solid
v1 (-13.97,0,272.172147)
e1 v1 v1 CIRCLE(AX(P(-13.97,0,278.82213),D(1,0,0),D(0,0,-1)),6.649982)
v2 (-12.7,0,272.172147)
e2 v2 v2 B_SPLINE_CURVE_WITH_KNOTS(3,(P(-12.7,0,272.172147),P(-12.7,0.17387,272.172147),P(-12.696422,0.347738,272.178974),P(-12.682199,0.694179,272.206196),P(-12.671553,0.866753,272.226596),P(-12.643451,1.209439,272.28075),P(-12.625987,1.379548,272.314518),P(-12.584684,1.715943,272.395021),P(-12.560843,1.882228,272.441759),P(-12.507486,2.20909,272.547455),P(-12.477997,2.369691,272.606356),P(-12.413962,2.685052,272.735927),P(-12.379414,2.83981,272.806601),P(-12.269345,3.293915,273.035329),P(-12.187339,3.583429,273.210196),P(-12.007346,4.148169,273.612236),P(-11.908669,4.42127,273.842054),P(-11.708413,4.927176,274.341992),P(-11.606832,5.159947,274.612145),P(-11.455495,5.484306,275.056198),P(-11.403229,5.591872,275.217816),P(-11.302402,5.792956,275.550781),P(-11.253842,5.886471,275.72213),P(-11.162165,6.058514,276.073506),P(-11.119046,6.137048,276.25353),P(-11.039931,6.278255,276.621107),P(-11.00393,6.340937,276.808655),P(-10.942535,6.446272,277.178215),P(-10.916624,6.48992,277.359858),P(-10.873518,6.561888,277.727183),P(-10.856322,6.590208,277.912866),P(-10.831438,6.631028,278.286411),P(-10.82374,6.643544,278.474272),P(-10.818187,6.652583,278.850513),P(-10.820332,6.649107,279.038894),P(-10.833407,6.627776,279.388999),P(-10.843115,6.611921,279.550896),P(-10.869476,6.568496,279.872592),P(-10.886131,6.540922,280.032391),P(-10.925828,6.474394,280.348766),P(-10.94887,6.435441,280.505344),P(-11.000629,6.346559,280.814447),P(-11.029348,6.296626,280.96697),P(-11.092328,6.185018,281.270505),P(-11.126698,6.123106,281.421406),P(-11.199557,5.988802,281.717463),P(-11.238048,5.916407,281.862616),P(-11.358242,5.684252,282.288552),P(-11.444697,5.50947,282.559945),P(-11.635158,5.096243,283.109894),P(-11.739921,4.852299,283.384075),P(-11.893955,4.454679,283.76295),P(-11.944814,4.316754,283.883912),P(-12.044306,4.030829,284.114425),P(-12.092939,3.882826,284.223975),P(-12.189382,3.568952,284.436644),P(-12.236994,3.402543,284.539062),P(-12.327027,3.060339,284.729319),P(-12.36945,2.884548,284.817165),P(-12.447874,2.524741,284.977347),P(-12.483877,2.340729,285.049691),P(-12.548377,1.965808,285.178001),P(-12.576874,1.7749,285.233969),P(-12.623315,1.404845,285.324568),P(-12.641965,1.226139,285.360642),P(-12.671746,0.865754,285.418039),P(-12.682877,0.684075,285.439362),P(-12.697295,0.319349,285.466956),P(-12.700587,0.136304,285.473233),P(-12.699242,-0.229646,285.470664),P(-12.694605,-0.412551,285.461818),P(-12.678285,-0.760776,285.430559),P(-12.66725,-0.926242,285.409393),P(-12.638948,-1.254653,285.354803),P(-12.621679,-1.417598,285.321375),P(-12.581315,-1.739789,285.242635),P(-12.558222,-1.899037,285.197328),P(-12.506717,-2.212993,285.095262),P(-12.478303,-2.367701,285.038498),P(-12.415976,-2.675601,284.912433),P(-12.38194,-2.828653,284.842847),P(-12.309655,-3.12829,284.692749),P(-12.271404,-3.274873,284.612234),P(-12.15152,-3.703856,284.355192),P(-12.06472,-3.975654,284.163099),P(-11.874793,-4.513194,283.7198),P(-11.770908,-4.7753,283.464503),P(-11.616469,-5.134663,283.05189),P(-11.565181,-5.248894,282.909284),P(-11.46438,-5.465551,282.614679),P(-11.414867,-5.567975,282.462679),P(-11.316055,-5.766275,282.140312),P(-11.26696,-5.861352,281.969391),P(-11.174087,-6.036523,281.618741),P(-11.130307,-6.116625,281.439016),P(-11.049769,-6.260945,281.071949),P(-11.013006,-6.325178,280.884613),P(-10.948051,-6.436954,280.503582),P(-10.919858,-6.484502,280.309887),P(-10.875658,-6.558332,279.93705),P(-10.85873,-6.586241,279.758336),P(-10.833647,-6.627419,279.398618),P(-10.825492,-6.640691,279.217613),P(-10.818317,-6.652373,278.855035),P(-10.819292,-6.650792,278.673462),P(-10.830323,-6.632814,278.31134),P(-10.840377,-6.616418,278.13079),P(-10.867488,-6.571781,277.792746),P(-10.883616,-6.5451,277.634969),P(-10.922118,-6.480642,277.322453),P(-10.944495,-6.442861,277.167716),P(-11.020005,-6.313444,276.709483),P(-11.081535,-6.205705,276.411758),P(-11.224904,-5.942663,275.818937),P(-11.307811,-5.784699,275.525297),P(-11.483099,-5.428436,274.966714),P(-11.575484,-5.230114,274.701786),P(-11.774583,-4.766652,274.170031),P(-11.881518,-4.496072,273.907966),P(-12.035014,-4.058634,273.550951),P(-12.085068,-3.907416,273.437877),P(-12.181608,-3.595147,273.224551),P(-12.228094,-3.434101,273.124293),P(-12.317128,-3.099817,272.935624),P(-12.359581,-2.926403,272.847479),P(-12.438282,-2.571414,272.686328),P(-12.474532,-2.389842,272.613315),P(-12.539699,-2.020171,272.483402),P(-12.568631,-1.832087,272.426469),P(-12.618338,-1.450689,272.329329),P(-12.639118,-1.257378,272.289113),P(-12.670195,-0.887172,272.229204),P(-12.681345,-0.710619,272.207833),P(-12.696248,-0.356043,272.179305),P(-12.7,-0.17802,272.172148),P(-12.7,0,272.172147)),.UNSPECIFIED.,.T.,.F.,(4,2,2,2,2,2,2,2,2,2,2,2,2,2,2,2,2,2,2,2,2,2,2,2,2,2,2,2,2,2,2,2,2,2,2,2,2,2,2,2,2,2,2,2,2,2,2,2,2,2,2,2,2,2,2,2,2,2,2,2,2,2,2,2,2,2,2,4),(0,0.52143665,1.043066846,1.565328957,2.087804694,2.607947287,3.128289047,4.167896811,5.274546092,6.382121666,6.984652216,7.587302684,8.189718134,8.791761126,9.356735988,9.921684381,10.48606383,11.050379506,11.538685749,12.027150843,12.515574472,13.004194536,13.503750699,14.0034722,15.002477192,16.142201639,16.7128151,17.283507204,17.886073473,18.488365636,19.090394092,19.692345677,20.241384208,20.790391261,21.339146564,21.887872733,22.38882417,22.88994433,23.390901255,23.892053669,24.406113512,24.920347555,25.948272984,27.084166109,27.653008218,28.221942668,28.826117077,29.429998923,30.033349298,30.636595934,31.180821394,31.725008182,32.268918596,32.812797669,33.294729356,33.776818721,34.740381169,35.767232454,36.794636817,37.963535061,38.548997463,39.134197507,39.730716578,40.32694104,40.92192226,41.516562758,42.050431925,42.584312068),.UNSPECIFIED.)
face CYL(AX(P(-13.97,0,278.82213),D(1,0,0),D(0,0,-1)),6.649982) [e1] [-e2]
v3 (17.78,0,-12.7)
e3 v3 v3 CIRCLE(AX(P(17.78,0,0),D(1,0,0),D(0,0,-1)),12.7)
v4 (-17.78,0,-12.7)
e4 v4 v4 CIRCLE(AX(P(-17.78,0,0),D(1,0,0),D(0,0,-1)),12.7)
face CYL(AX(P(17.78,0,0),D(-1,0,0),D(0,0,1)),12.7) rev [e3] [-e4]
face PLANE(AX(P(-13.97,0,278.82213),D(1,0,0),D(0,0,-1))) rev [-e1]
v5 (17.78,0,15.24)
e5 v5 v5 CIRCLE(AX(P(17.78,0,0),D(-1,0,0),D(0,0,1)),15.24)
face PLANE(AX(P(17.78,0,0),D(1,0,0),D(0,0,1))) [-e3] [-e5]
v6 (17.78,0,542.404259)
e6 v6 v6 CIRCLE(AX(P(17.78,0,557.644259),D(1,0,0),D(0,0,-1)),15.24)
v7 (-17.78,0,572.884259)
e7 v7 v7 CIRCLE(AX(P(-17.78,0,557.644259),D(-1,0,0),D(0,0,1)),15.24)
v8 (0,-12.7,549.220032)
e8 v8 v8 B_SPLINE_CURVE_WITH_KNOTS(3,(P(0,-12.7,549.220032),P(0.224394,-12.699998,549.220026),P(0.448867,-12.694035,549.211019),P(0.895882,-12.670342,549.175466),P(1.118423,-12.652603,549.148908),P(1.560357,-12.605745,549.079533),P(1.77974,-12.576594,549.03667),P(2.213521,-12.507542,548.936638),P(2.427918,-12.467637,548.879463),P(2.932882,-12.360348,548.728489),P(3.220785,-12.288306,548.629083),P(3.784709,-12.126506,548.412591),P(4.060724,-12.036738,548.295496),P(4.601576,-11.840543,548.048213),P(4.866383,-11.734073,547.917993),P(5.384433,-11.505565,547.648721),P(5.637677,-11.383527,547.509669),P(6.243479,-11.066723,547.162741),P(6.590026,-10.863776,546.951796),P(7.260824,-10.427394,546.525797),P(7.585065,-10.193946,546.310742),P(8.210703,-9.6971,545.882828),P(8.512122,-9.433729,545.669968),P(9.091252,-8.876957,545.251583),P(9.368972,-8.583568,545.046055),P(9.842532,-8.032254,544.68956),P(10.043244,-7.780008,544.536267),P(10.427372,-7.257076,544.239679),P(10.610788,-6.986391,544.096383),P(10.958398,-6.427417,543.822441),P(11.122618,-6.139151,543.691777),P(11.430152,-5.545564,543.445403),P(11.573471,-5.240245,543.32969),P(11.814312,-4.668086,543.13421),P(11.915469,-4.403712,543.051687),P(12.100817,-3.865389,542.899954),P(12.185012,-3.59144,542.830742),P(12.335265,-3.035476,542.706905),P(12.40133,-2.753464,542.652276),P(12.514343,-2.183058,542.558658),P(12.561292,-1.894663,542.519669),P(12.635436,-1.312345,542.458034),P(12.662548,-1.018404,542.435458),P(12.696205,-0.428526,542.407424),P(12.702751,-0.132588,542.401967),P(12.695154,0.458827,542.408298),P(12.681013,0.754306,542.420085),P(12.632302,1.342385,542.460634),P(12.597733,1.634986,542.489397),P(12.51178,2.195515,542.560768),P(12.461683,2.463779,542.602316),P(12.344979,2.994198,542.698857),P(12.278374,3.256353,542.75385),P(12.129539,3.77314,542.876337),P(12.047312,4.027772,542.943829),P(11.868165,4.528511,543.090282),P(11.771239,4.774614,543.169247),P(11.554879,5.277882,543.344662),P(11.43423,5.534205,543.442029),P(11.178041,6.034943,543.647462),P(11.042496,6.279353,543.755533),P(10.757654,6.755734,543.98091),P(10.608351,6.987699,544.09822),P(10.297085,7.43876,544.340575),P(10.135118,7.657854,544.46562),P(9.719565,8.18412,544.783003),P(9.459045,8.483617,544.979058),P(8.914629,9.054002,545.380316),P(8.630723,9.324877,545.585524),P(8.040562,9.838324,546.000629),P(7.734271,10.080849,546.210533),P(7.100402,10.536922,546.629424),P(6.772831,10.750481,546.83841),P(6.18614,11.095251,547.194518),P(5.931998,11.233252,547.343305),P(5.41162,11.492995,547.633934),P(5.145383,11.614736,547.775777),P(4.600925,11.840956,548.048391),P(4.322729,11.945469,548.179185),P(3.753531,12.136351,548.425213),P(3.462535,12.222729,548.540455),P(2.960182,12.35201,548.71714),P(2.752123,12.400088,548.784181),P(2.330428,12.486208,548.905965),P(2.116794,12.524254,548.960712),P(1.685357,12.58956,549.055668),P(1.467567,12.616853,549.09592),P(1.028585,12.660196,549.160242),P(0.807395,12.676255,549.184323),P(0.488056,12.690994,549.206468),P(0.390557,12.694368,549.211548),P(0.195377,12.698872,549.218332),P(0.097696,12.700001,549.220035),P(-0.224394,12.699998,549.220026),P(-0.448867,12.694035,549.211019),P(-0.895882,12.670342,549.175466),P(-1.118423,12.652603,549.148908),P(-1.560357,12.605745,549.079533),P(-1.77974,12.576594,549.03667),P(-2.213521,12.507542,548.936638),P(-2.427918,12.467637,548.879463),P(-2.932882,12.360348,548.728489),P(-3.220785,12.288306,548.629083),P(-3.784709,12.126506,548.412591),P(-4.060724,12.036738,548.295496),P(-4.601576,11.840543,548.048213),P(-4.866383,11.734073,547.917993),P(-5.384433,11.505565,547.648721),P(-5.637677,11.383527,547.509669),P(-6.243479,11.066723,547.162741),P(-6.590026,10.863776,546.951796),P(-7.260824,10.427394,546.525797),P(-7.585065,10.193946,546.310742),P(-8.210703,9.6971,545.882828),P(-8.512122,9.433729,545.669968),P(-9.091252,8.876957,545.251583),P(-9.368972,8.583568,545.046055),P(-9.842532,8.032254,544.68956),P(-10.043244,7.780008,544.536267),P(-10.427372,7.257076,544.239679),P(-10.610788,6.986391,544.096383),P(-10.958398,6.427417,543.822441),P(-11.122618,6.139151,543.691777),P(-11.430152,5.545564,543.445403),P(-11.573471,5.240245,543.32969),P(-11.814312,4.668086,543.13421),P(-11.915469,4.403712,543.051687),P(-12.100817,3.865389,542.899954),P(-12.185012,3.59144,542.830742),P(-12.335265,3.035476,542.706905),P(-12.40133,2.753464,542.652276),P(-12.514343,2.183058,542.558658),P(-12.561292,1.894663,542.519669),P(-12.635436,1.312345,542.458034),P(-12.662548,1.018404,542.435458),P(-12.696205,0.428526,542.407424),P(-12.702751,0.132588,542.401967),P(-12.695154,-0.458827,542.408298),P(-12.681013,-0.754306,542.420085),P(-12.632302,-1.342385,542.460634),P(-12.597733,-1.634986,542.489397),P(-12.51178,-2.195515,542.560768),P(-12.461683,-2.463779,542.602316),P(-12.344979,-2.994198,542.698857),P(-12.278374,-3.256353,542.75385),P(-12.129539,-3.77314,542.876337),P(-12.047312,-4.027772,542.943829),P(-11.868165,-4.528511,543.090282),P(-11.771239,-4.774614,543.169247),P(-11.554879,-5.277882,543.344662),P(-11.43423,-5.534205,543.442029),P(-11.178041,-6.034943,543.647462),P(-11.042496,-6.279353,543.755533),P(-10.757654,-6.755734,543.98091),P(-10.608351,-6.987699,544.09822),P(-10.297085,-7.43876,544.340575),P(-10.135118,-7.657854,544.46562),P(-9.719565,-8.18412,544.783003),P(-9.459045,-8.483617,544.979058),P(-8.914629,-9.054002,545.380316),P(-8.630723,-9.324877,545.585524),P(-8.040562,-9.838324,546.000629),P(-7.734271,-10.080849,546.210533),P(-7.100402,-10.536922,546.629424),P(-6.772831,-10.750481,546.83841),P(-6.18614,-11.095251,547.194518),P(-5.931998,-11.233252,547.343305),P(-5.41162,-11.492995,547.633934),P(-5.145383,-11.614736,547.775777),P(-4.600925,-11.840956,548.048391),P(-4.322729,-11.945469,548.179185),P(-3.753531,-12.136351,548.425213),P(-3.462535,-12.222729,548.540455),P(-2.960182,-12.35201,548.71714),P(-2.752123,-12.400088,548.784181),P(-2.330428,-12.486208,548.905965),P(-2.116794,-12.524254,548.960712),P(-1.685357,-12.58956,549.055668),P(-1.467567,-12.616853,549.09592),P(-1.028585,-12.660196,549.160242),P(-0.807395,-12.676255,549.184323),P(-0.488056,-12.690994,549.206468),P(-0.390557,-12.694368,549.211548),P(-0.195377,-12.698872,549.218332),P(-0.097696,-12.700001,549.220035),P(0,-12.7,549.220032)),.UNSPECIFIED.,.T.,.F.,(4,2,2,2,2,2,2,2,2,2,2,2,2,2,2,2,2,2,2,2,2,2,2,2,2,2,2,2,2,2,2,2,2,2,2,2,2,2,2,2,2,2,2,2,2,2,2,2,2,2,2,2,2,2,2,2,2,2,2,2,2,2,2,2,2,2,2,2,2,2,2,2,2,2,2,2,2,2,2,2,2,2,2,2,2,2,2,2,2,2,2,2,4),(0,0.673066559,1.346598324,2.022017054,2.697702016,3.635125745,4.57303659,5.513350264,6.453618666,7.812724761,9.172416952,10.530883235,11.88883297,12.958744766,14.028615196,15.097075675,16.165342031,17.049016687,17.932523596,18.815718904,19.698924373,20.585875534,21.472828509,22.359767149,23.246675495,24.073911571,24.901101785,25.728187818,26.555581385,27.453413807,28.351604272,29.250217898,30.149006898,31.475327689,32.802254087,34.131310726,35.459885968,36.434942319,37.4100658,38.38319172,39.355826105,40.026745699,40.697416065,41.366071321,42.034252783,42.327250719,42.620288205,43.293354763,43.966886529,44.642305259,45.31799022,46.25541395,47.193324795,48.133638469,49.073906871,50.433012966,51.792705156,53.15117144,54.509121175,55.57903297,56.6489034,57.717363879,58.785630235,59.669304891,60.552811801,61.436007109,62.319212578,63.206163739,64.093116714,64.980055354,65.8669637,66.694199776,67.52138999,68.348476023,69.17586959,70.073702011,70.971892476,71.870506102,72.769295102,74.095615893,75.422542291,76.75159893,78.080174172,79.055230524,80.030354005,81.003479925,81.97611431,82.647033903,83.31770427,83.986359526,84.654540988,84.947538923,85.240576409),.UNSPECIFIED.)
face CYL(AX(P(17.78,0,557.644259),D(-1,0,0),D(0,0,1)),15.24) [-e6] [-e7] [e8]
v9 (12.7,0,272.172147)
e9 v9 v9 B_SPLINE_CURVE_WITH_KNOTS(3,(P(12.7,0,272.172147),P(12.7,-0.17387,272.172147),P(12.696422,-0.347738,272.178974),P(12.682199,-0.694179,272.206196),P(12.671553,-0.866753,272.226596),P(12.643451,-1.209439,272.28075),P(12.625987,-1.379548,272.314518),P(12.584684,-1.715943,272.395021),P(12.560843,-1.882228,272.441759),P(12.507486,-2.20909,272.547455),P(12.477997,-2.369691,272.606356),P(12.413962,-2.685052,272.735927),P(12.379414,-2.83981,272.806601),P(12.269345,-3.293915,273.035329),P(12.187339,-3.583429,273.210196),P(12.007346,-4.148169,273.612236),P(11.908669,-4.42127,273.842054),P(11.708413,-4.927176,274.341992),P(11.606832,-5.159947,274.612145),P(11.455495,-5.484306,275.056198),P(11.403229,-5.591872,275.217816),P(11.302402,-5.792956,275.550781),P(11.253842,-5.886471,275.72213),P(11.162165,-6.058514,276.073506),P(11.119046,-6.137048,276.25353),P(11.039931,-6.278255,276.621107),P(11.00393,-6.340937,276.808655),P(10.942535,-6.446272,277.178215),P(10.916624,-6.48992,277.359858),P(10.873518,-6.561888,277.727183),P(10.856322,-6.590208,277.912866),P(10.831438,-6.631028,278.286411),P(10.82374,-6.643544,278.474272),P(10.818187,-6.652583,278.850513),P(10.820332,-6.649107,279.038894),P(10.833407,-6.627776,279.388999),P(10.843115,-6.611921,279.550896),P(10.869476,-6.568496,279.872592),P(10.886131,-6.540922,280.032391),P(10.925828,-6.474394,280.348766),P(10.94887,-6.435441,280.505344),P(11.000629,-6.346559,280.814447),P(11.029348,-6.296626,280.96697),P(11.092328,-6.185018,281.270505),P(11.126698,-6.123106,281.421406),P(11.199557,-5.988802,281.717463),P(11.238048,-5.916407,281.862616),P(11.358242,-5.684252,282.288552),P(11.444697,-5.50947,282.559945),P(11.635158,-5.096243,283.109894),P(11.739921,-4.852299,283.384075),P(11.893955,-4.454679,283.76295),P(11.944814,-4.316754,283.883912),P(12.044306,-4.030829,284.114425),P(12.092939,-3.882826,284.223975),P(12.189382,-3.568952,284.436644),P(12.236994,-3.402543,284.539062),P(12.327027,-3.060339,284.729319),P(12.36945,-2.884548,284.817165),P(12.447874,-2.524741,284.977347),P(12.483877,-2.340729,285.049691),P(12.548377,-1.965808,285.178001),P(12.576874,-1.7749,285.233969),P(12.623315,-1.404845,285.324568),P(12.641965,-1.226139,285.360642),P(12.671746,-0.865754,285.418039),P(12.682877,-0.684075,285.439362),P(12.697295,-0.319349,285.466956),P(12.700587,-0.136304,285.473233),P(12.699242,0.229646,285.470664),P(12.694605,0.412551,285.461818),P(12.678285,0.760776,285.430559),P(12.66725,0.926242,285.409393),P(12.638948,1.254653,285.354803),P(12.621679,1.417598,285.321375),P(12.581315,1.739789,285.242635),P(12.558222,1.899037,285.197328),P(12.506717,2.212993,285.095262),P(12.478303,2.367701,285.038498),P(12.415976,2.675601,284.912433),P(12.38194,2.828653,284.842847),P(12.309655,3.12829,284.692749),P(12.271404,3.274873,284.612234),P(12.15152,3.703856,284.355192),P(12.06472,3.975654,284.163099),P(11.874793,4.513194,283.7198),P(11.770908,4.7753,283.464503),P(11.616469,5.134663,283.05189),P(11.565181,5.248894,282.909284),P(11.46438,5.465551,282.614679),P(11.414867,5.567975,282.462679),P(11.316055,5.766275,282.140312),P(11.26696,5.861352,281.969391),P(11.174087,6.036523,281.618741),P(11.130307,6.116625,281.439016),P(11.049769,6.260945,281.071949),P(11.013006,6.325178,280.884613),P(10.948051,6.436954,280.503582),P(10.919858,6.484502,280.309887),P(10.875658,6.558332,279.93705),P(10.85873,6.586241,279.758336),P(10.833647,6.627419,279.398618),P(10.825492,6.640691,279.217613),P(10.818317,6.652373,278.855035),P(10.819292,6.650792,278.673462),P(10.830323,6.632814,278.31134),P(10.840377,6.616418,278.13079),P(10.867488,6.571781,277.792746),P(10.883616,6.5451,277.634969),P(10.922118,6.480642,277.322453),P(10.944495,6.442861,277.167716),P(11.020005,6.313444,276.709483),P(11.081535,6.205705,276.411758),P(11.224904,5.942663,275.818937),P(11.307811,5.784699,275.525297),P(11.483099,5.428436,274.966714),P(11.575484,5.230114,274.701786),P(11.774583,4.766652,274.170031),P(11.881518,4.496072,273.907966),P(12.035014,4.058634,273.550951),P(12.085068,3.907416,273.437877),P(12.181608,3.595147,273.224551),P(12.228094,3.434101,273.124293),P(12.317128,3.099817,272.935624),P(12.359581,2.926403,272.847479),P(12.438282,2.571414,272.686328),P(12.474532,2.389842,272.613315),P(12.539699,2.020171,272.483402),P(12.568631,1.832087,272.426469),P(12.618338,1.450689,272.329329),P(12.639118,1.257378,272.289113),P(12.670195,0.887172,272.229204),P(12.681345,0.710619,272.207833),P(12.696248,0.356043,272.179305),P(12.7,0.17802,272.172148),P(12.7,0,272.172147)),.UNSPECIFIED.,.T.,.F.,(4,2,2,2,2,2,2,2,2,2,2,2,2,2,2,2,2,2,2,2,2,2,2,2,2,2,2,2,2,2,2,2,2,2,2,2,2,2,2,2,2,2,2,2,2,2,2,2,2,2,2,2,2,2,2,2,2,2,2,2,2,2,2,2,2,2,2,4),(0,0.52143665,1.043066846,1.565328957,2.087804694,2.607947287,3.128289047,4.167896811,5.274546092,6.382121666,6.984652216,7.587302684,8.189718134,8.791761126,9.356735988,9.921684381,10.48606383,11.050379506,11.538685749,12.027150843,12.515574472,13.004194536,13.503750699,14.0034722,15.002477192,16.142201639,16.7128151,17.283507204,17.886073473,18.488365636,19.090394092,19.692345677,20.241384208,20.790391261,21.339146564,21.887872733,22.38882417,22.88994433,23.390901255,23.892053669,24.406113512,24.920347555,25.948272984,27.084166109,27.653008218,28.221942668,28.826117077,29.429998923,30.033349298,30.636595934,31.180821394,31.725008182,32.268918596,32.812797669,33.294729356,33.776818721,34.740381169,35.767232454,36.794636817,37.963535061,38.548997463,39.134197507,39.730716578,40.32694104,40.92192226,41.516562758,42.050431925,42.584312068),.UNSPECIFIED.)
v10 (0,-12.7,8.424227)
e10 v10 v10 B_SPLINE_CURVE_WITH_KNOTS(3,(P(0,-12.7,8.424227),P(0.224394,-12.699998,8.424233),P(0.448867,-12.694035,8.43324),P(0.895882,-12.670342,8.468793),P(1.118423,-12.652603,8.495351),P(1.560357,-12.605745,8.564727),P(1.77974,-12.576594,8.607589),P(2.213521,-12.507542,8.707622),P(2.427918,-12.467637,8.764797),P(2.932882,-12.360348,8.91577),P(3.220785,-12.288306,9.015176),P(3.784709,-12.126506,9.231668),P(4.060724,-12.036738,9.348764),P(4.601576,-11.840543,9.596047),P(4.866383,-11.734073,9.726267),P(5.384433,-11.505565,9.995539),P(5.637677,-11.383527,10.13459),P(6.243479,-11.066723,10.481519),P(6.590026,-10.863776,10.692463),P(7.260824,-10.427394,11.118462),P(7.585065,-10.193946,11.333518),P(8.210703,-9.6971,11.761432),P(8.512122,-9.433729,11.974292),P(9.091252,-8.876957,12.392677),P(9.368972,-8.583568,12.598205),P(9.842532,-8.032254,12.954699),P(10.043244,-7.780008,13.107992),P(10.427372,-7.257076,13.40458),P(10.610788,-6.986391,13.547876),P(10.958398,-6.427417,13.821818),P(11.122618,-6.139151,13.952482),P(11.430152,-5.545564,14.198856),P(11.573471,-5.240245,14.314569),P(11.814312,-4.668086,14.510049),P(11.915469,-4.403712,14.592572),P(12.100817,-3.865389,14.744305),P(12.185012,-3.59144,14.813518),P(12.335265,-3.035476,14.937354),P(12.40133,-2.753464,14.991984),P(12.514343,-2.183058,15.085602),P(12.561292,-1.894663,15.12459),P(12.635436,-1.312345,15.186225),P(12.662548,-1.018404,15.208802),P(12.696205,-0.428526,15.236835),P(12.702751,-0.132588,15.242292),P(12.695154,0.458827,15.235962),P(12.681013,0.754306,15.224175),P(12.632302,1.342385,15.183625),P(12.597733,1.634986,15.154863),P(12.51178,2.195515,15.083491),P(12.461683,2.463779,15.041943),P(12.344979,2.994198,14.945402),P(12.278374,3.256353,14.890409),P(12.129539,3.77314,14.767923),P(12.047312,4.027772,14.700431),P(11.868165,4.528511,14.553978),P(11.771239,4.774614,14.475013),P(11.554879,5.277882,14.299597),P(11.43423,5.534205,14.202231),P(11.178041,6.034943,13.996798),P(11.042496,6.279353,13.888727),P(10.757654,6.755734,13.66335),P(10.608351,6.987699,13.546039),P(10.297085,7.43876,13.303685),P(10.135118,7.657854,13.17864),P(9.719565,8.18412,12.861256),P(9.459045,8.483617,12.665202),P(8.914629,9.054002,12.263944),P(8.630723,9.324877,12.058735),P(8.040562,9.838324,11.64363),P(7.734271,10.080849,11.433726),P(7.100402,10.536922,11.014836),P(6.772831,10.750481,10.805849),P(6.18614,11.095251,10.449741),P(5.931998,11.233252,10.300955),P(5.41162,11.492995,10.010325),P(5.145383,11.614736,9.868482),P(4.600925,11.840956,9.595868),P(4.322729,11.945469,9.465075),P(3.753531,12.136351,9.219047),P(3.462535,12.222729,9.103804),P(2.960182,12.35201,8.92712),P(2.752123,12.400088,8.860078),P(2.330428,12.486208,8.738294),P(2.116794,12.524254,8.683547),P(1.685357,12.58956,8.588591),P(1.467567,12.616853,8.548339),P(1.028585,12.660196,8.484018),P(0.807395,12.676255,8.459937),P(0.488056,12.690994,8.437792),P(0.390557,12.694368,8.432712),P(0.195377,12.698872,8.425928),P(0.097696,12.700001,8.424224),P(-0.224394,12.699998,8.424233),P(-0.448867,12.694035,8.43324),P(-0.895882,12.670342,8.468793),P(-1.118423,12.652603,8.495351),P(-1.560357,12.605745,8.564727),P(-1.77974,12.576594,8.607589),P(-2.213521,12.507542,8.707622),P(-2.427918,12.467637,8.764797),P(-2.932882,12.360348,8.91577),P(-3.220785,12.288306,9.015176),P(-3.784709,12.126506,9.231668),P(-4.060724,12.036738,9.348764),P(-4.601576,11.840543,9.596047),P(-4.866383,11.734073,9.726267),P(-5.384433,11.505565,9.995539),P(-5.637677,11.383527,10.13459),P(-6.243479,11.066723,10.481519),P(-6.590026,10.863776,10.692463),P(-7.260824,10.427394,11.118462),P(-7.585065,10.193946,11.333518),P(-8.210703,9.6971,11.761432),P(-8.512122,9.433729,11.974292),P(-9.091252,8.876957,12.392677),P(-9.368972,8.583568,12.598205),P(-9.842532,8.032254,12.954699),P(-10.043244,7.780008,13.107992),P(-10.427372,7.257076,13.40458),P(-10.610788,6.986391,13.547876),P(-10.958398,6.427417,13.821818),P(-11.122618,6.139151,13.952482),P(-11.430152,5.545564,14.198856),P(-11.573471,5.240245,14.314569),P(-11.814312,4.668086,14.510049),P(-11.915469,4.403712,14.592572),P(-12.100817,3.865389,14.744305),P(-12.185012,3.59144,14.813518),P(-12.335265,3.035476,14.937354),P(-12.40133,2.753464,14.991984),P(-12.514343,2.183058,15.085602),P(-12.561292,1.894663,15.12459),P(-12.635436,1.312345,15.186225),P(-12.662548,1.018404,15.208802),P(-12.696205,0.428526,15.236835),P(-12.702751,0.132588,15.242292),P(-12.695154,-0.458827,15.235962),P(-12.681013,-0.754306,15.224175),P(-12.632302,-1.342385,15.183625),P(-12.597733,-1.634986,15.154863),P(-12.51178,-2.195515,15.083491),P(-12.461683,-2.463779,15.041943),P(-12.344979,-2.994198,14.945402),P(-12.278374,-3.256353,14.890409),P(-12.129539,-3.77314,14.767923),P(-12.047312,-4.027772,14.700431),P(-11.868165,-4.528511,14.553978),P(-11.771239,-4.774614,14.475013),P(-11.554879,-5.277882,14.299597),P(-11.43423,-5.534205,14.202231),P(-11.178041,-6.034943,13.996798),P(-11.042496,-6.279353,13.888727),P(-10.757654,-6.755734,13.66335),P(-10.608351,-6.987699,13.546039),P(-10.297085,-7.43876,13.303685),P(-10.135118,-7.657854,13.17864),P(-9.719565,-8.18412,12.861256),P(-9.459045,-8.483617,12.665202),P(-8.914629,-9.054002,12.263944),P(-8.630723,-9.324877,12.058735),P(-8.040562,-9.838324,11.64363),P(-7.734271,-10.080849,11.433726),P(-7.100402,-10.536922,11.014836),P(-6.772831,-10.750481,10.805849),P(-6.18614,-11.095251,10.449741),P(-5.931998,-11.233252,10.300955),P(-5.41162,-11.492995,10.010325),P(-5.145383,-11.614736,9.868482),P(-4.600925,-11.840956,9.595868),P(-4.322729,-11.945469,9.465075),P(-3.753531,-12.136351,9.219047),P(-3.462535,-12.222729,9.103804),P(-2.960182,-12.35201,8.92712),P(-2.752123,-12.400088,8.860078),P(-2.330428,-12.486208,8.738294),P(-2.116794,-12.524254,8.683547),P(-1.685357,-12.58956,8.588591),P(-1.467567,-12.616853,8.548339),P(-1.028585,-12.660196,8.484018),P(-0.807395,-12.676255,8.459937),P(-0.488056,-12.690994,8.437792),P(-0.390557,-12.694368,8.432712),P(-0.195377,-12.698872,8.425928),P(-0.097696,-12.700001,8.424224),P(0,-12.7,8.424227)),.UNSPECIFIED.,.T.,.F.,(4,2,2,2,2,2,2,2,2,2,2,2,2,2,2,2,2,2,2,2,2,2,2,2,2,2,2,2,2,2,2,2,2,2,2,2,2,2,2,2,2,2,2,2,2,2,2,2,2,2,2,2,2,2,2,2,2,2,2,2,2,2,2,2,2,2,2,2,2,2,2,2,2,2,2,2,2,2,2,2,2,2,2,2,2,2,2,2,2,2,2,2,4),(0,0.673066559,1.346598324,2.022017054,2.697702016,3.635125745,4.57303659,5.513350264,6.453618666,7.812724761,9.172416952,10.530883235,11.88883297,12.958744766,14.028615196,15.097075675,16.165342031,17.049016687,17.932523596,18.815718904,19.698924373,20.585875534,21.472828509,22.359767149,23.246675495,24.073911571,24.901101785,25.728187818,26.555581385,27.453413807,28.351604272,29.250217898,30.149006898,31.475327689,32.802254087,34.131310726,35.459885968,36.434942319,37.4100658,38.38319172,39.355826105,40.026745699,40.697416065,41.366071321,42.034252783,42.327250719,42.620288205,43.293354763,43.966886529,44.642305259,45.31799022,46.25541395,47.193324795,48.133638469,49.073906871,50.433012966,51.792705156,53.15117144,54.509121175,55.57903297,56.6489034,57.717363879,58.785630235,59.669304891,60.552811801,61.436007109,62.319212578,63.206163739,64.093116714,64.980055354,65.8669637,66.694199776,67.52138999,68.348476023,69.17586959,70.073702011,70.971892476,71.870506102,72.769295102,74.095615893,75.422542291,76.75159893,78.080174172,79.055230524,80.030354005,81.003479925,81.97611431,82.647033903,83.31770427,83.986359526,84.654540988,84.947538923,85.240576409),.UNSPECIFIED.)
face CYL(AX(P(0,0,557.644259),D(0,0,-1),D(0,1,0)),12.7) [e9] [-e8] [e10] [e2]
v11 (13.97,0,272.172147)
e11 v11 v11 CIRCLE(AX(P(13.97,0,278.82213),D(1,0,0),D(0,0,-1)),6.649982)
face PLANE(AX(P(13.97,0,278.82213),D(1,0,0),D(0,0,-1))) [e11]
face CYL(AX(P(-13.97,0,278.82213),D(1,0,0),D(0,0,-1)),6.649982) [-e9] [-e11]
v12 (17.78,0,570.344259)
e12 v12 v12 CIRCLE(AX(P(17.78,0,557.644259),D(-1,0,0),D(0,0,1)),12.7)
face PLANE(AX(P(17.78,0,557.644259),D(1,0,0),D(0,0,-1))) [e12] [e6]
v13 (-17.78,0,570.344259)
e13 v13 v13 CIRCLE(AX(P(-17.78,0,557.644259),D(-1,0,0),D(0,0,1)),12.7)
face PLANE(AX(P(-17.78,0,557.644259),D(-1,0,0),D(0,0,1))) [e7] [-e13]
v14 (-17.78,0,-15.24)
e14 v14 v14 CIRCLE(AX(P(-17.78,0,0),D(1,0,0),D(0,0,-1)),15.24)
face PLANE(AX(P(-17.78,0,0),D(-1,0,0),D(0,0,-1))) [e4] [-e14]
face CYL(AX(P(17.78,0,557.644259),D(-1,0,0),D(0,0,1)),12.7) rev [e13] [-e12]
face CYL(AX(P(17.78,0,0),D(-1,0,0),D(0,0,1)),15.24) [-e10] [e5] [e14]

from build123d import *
from build123d.topology import SkipClean

# Parameters (mm, degrees)
SKETCH2_R                = 12.7
SKETCH4_R                = 15.24
SKETCH5_R                = 15.24
BOSS_EXTRUDE1_DEPTH      = 17.78
SKETCH7_R                = 12.7
CUT_EXTRUDE1_DEPTH       = 575.189120366
BOSS_EXTRUDE2_DEPTH      = 13.97
BOSS_EXTRUDE2_DEPTH_BACK = 13.97
SKETCH8_R                = 6.649982279


with BuildPart() as part:
    # Sweep1: sweep along a path in Sketch1
    with BuildLine(Plane(origin=(0, 0, 0), x_dir=(0, 0, -1), z_dir=(1, 0, 0))) as sweep1_path:
        Line((0, 0), (-557.64425936, 0))
    # Sketch2 → Sweep1 (sweep)
    with BuildSketch(Plane.XY):
        Circle(SKETCH2_R)
    sweep(path=sweep1_path.line)

    # Sweep2: sweep along a path in Sketch3
    with BuildLine(Plane(origin=(0, 0, 0), x_dir=(1, 0, 0), z_dir=(0, 1, 0))) as sweep2_path:
        Line((0, -557.64425936), (17.78, -557.64425936))
    # Sketch4 → Sweep2 (sweep)
    with BuildSketch(Plane(origin=(0, 0, 0), x_dir=(0, 0, -1), z_dir=(1, 0, 0))):
        with Locations((-557.64425936, 0)):
            Circle(SKETCH4_R)
    sweep2 = sweep(path=sweep2_path.line)

    # Sketch5 → Boss-Extrude1 (add)
    with SkipClean():  # the faces are left unmerged after this step: merging them gives an invalid solid
        with BuildSketch(Plane.ZY):
            with Locations((557.64425936, 0)):
                Circle(SKETCH5_R)
        boss_extrude1 = extrude(amount=BOSS_EXTRUDE1_DEPTH)
    add(part.part.scale(1), mode=Mode.REPLACE)  # the faces are merged on a copy

    # Sketch7 → Cut-Extrude1 (cut, through all)
    with BuildSketch(Plane.ZY.offset(17.78)):
        with Locations((557.64425936, 0)):
            Circle(SKETCH7_R)
    cut_extrude1 = extrude(amount=-CUT_EXTRUDE1_DEPTH, mode=Mode.SUBTRACT)

    # Mirror1: Sweep2, Boss-Extrude1, Cut-Extrude1 across plane
    add(sweep2.mirror(Plane.XY.offset(278.82212968)))
    add(boss_extrude1.mirror(Plane.XY.offset(278.82212968)))
    add(cut_extrude1.mirror(Plane.XY.offset(278.82212968)), mode=Mode.SUBTRACT)

    # Sketch8 → Boss-Extrude2 (add, two sides: drawn at the far end of the back side and taken through both)
    with BuildSketch(Plane(origin=(0, 0, 0), x_dir=(0, 0, -1), z_dir=(1, 0, 0)).offset(-BOSS_EXTRUDE2_DEPTH_BACK)):
        with Locations((-278.82212968, 0)):
            Circle(SKETCH8_R)
    extrude(amount=BOSS_EXTRUDE2_DEPTH + BOSS_EXTRUDE2_DEPTH_BACK)


solid = part.part
